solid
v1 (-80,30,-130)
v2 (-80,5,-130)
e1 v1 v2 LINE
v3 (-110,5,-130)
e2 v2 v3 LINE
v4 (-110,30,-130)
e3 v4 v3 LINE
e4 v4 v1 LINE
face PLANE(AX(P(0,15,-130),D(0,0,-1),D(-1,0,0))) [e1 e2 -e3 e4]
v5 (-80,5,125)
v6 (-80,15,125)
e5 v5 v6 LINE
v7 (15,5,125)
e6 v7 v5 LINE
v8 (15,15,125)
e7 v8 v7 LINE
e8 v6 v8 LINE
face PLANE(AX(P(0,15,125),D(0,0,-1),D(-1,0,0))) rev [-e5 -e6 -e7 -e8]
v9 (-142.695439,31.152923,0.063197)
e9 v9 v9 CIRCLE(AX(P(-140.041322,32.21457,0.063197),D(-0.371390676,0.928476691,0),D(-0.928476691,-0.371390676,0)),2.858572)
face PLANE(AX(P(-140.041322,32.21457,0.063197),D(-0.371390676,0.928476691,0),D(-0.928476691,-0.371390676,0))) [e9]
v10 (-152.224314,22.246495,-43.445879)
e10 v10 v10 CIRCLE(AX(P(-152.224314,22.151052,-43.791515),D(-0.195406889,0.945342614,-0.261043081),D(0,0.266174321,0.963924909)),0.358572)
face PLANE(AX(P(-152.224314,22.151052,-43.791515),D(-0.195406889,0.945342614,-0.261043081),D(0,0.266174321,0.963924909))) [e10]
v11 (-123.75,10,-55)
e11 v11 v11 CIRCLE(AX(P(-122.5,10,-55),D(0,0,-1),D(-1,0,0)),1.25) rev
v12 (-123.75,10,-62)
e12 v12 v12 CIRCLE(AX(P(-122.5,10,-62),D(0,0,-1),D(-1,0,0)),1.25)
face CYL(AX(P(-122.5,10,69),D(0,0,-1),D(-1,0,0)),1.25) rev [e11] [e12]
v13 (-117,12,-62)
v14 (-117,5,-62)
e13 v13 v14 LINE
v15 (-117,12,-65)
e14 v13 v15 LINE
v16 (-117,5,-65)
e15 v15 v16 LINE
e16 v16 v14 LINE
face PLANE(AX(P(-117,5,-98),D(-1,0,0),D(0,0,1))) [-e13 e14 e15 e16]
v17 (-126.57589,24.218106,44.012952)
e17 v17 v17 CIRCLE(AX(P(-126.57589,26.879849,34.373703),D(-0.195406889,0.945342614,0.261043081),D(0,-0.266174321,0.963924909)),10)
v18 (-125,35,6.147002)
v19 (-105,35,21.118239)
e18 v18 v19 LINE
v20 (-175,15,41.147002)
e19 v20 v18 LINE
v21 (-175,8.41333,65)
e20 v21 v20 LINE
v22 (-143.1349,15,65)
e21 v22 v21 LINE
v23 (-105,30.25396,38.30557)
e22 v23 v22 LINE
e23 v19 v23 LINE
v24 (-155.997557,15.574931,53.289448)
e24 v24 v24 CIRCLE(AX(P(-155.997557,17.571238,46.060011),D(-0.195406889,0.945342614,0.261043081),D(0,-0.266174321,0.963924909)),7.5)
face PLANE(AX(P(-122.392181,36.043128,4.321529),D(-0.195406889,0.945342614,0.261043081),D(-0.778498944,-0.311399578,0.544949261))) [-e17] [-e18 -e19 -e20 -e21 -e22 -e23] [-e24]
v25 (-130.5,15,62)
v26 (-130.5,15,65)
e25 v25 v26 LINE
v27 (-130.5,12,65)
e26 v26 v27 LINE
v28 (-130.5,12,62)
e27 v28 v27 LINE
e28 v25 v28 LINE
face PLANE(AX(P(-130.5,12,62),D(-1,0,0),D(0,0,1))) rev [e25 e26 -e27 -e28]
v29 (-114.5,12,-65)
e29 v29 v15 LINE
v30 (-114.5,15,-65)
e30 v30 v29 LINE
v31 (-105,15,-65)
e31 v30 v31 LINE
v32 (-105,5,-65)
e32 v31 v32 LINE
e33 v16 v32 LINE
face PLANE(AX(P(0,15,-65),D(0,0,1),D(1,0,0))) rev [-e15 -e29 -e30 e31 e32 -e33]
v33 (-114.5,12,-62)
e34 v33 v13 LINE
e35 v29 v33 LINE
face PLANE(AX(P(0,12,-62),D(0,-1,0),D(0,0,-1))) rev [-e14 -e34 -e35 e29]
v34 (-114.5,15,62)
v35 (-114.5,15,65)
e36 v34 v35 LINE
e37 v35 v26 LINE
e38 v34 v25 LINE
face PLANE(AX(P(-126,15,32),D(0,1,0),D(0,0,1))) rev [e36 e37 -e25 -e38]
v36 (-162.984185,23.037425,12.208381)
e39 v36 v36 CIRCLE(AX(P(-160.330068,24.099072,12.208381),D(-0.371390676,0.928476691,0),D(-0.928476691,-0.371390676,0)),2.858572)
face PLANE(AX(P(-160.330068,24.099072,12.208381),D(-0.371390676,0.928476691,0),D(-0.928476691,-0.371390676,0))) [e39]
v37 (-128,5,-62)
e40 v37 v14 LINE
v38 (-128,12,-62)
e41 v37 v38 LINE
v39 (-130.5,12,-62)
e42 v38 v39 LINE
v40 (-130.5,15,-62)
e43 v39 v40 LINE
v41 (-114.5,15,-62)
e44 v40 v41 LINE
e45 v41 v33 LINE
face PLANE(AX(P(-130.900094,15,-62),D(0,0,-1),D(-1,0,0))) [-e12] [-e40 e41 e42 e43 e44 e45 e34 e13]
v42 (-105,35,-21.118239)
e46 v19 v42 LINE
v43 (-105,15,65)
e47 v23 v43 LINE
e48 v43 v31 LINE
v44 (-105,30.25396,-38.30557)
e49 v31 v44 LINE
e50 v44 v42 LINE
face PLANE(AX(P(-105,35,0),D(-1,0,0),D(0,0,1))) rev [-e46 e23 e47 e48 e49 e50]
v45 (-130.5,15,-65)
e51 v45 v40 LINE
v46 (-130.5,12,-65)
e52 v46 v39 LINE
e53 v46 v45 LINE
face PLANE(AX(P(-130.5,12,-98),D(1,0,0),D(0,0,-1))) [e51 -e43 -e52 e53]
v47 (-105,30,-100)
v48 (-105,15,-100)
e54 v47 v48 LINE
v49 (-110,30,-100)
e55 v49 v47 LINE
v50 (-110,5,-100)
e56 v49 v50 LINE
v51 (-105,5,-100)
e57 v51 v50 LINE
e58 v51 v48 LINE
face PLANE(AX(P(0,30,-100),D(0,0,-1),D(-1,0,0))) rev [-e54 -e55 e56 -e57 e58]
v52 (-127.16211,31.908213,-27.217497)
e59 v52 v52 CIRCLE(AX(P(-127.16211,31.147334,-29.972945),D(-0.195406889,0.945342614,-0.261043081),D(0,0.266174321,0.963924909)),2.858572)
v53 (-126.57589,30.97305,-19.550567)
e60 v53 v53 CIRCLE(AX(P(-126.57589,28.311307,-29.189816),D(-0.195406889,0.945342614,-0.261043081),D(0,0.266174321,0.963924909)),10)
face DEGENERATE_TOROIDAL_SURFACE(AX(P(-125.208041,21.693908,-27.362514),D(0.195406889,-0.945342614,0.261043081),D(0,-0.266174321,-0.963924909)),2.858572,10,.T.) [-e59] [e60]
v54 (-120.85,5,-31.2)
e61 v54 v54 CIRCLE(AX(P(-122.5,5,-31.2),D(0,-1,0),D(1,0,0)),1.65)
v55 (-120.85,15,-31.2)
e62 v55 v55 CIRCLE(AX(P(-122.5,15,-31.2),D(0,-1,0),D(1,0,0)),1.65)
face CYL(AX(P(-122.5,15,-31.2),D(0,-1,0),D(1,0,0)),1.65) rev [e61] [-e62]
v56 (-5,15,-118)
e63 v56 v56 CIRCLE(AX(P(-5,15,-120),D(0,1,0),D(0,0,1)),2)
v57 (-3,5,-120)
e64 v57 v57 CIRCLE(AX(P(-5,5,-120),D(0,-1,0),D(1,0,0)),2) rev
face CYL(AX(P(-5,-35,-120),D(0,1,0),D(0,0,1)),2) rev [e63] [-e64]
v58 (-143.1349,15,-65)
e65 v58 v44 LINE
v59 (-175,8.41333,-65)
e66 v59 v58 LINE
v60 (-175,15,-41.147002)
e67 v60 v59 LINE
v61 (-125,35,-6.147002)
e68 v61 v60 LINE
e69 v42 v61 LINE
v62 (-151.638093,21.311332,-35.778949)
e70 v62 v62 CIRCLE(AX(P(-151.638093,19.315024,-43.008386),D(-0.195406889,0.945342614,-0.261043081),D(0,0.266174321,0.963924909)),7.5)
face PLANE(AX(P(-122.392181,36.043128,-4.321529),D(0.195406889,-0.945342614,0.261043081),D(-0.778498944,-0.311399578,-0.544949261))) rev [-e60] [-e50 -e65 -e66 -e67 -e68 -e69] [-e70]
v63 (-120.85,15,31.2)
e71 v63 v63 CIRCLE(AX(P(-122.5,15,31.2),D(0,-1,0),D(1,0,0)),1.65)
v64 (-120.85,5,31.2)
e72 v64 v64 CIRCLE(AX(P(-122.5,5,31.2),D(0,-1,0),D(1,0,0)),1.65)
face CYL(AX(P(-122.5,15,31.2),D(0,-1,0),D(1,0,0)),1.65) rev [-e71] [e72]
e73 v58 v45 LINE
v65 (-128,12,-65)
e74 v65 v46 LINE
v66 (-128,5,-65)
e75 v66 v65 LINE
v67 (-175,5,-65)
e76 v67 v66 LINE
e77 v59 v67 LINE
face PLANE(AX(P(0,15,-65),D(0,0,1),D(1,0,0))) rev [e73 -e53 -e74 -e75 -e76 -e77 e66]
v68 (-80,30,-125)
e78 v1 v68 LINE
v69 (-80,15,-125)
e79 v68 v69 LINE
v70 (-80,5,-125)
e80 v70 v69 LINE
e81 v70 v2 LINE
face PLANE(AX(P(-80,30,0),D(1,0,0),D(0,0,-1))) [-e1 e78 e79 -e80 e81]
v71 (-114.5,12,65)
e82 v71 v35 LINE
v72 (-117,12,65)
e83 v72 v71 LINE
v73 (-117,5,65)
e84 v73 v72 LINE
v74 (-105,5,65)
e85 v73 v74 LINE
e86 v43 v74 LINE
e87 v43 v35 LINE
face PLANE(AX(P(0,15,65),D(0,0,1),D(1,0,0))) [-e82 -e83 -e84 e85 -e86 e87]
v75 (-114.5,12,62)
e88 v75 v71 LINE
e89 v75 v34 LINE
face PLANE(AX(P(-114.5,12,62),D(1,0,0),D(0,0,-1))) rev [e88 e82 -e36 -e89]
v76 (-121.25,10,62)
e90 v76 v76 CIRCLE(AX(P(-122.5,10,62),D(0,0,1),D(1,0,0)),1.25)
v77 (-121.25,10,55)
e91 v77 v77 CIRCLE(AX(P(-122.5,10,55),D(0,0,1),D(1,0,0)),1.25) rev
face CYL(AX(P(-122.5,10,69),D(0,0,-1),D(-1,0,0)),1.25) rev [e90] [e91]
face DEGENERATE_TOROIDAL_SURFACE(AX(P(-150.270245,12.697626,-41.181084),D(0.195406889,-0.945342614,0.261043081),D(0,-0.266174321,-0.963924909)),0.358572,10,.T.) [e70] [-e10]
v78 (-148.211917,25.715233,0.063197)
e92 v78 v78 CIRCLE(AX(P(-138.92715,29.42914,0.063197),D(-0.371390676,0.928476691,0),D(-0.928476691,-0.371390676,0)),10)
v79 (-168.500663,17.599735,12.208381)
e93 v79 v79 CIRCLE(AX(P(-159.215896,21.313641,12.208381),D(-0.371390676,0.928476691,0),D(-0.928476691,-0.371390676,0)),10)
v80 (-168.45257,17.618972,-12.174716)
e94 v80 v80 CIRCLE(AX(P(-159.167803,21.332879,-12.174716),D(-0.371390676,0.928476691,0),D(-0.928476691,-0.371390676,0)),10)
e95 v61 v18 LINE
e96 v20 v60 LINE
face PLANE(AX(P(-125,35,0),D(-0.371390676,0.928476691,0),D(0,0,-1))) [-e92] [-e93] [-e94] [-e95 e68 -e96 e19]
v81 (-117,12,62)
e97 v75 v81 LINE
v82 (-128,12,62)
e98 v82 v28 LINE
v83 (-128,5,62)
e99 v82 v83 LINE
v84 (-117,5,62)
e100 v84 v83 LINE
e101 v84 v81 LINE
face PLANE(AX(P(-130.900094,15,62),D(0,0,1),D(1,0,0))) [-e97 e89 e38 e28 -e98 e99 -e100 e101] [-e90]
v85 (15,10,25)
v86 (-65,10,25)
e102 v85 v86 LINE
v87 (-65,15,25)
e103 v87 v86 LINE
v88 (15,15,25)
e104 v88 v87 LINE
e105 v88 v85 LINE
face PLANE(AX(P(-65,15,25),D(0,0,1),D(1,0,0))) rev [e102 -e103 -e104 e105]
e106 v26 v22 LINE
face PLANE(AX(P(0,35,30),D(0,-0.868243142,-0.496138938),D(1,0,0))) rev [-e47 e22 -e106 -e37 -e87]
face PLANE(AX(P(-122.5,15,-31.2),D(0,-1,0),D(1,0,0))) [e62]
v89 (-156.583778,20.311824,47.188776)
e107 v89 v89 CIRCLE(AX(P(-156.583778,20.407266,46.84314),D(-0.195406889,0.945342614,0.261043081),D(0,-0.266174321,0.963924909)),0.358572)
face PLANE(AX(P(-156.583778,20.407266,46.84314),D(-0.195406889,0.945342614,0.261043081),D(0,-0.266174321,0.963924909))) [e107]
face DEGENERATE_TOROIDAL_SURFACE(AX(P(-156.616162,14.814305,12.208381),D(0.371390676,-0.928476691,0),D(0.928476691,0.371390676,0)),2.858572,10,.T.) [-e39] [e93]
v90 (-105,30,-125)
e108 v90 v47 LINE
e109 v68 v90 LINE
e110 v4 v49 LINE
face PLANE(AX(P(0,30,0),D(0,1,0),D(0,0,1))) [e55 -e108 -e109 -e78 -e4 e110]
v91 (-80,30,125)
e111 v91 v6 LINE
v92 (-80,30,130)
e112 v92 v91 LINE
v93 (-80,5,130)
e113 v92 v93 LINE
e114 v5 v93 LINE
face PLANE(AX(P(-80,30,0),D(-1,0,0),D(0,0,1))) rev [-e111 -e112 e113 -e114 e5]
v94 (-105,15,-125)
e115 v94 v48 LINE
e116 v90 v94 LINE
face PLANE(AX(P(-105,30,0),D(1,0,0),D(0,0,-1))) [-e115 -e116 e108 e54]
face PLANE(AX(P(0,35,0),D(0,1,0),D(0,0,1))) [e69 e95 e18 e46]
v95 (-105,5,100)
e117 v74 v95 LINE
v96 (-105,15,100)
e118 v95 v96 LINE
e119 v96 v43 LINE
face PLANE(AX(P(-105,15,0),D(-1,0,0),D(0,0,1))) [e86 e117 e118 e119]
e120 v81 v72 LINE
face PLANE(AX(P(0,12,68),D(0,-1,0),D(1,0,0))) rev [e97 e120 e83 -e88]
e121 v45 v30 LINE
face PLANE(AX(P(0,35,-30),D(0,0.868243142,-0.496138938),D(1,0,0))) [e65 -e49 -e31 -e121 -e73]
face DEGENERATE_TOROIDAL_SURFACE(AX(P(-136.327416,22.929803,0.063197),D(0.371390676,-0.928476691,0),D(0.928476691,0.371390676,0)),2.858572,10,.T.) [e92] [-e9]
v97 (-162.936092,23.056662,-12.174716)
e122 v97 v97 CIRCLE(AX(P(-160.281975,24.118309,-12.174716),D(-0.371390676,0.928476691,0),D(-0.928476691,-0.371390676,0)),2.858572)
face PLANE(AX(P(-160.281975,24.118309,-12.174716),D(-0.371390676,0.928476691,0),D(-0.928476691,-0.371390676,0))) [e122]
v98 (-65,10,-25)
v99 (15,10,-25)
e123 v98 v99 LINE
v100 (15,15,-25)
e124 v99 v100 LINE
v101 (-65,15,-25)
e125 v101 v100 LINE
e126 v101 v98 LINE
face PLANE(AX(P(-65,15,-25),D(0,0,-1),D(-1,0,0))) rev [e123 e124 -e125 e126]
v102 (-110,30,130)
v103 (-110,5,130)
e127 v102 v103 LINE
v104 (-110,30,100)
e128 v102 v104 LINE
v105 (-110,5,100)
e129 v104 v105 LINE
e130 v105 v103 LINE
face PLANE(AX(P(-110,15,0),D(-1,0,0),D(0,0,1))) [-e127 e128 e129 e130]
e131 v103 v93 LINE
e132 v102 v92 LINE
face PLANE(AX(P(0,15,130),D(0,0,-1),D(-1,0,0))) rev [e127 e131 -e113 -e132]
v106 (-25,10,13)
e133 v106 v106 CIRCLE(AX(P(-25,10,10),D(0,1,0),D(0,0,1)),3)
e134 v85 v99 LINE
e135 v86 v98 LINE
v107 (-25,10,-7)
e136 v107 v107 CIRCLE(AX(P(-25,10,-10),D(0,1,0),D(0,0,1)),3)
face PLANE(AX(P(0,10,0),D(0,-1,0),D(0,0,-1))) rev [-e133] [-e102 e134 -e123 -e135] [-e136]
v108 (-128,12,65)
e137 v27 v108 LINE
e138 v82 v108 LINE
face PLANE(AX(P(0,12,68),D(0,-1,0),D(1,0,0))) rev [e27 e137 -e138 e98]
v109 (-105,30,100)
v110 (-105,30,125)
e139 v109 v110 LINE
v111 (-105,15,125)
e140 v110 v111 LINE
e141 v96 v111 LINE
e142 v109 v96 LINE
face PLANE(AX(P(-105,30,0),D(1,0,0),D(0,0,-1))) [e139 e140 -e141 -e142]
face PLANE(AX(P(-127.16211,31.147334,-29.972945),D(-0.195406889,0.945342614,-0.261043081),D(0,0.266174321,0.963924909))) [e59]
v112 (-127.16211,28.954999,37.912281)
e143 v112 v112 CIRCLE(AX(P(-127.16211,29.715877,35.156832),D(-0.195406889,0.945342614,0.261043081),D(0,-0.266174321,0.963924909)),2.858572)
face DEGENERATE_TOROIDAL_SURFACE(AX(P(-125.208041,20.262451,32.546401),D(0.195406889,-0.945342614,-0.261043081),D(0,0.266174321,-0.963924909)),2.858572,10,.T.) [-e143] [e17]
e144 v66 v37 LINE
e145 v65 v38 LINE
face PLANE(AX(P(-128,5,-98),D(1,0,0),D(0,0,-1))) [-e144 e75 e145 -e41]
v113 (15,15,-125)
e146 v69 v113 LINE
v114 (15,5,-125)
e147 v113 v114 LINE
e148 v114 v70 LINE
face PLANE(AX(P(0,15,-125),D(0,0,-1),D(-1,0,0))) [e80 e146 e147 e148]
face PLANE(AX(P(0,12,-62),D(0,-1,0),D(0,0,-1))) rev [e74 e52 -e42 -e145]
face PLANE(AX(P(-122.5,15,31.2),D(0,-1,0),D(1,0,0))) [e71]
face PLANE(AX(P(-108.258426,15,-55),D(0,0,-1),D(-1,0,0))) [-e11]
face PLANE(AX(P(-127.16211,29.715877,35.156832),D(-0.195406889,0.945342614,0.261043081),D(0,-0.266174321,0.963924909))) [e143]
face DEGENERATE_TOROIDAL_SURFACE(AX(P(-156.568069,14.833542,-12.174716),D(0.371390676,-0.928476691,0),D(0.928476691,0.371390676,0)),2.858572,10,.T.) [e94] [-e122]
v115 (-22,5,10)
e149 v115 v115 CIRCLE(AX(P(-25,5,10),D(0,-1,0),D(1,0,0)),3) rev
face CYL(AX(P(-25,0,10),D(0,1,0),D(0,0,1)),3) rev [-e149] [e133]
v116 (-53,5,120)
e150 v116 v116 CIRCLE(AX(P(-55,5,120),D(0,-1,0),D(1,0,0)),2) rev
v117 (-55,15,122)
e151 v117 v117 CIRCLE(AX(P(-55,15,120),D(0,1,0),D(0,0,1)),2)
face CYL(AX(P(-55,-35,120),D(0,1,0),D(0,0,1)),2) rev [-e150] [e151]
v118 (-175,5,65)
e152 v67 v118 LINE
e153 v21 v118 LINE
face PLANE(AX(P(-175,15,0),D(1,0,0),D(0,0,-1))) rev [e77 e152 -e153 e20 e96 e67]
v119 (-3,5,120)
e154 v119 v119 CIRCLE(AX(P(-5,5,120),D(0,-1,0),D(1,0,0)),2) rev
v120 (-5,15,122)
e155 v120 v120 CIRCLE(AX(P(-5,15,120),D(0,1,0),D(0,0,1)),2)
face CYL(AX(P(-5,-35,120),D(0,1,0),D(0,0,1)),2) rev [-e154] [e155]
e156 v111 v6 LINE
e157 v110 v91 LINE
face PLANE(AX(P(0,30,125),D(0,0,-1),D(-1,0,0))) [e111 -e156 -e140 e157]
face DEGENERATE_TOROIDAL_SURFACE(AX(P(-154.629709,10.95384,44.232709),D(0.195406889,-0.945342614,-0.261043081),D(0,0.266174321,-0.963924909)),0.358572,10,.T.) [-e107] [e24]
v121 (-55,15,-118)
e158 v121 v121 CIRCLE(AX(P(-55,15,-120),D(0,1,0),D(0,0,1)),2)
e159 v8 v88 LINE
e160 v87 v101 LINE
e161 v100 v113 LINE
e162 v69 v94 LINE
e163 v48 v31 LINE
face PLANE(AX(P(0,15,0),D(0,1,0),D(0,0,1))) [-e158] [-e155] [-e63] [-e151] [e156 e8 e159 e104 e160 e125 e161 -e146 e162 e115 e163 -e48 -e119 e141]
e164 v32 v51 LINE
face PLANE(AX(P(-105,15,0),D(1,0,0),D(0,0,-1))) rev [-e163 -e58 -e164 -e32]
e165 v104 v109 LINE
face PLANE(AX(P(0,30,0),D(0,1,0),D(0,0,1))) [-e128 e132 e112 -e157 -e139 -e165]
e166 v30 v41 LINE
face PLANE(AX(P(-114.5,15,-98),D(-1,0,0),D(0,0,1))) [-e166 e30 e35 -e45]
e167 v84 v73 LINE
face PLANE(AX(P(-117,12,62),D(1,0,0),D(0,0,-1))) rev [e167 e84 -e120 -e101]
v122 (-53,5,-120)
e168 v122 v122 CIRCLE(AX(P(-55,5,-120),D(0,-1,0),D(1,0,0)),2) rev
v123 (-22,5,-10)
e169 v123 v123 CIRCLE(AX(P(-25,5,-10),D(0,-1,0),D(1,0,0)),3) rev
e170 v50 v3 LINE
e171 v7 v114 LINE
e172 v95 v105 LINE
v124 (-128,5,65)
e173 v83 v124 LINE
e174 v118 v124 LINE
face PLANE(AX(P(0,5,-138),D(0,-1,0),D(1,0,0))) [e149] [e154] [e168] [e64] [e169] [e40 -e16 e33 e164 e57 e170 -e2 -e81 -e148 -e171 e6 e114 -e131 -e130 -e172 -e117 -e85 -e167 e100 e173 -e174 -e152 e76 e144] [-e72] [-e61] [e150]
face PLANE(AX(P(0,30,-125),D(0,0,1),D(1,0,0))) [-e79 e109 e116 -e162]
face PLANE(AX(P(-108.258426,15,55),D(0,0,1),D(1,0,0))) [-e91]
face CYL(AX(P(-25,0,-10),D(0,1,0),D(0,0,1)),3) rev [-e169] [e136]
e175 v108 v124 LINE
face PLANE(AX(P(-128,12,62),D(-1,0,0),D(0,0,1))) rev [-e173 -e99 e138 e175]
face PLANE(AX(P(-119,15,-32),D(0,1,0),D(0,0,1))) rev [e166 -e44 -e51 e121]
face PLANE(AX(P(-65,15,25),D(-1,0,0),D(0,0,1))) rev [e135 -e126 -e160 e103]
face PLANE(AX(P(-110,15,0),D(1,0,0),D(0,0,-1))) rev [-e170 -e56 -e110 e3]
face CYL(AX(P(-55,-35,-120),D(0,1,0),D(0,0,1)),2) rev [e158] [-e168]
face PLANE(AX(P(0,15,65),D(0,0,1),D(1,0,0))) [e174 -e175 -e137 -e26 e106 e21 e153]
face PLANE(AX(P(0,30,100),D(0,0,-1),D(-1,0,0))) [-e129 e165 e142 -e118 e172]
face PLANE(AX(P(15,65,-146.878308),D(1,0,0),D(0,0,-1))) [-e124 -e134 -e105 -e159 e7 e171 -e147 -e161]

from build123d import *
from OCP.BRepFilletAPI import BRepFilletAPI_MakeChamfer

# Parameters (mm, degrees)
AUFSATZ_LINEAR_AUSTRAGEN1_DEPTH      = 15
SKIZZE2_W                            = 5
SKIZZE2_H                            = 4
SKIZZE2_H_2                          = 3
AUFSATZ_LINEAR_AUSTRAGEN2_DEPTH      = 37
AUFSATZ_LINEAR_AUSTRAGEN3_DEPTH      = 15
SKIZZE4_W                            = 5
SKIZZE4_H                            = 250
AUFSATZ_LINEAR_AUSTRAGEN4_DEPTH      = 15
SKIZZE5_W                            = 30
SKIZZE5_H                            = 5
AUFSATZ_LINEAR_AUSTRAGEN5_DEPTH      = 30
AUFSATZ_LINEAR_AUSTRAGEN6_DEPTH      = 15
AUFSATZ_LINEAR_AUSTRAGEN6_2_DEPTH    = 15
SKIZZE7_W                            = 5
SKIZZE7_H                            = 5
AUFSATZ_LINEAR_AUSTRAGEN7_DEPTH      = 15
AUFSATZ_LINEAR_AUSTRAGEN8_DEPTH      = 15
AUFSATZ_LINEAR_AUSTRAGEN8_DEPTH_BACK = 15
SKIZZE8_W                            = 5
SKIZZE8_H                            = 30.74644599
SKIZZE8_H_2                          = 29.008771532
SKIZZE9_W                            = 5
SKIZZE9_H                            = 5
AUFSATZ_LINEAR_AUSTRAGEN10_DEPTH     = 15
SKIZZE10_W                           = 5
SKIZZE10_H                           = 30
SCHNITT_LINEAR_AUSTRAGEN1_DEPTH      = 1.01
SKIZZE12_W                           = 10.711230156
SKIZZE12_H                           = 5
SKIZZE12_W_2                         = 5
SKIZZE12_H_2                         = 5.74644599
SKIZZE12_H_3                         = 4.008771532
SKIZZE12_W_3                         = 18.406645612
SKIZZE12_H_4                         = 11.130363441
SKIZZE12_W_4                         = 9.588104439
SKIZZE12_H_5                         = 13.193622238
SCHNITT_LINEAR_AUSTRAGEN2_DEPTH      = 15
SKIZZE13_W                           = 10.711230156
SKIZZE13_H                           = 5
SKIZZE13_W_2                         = 9.588104439
SKIZZE13_W_3                         = 5
SKIZZE13_H_2                         = 13.193622238
SKIZZE13_H_3                         = 11.130363441
SKIZZE13_W_4                         = 18.406645612
SCHNITT_LINEAR_AUSTRAGEN3_DEPTH      = 15
SKIZZE14_W                           = 50
SKIZZE14_H                           = 50
SKIZZE14_W_2                         = 20
AUFSATZ_LINEAR_AUSTRAGEN11_DEPTH     = 20
FASE2_SIZE                           = 20
FASE2_SIZE2                          = 50
FASE3_SIZE                           = 20
FASE3_SIZE2                          = 35
FASE4_SIZE                           = 20
SKIZZE15_R                           = 10
SKIZZE15_R_2                         = 7.5
AUFSATZ_LINEAR_AUSTRAGEN12_DEPTH     = 3
VERRUNDUNG1_R                        = 10
SKIZZE18_R                           = 10
SKIZZE18_R_2                         = 7.5
AUFSATZ_LINEAR_AUSTRAGEN13_DEPTH     = 3
VERRUNDUNG2_R                        = 10
SKIZZE19_R                           = 10
AUFSATZ_LINEAR_AUSTRAGEN14_DEPTH     = 3
VERRUNDUNG3_R                        = 10
SKIZZE20_R                           = 1.5
SCHNITT_LINEAR_AUSTRAGEN4_DEPTH      = 250
SKIZZE21_W                           = 4
SKIZZE21_H                           = 7
SKIZZE21_H_2                         = 5.2
SKIZZE21_W_2                         = 41
AUFSATZ_LINEAR_AUSTRAGEN15_DEPTH     = 10
SKIZZE22_R                           = 1.75
SCHNITT_LINEAR_AUSTRAGEN5_DEPTH      = 20
SCHNITT_LINEAR_AUSTRAGEN8_DEPTH      = 50
SCHNITT_LINEAR_AUSTRAGEN8_DEPTH_BACK = 50
SKIZZE25_W                           = 212.967285893
SKIZZE25_H                           = 303.234570009
SKIZZE26_W                           = 50
SKIZZE26_H                           = 5
SCHNITT_LINEAR_AUSTRAGEN9_DEPTH      = 80
SKIZZE28_R                           = 12.5
SCHNITT_LINEAR_AUSTRAGEN10_DEPTH     = 80
SKIZZE29_R                           = 23.129558289
AUFSATZ_LINEAR_AUSTRAGEN16_DEPTH     = 10
SKIZZE33_W                           = 50
SKIZZE33_H                           = 5
AUFSATZ_LINEAR_AUSTRAGEN17_DEPTH     = 160
SKIZZE34_W                           = 160
SKIZZE34_H                           = 50
AUFSATZ_LINEAR_AUSTRAGEN18_DEPTH     = 15
SKIZZE36_R                           = 2.5
SCHNITT_LINEAR_AUSTRAGEN12_DEPTH     = 250
SKIZZE37_R                           = 3
SCHNITT_LINEAR_AUSTRAGEN16_DEPTH     = 78
SKIZZE38_R                           = 2
SCHNITT_LINEAR_AUSTRAGEN17_DEPTH     = 50
SKIZZE39_W                           = 160
SKIZZE39_H                           = 50
SCHNITT_LINEAR_AUSTRAGEN18_DEPTH     = 15
SCHNITT_LINEAR_START                 = -5
SKIZZE40_W                           = 160
SKIZZE40_H                           = 50
SKIZZE40_R                           = 3
SCHNITT_LINEAR_AUSTRAGEN19_DEPTH     = 5
SKIZZE41_R                           = 3
SCHNITT_LINEAR_AUSTRAGEN22_DEPTH     = 10
SKIZZE46_W                           = 65
SKIZZE46_H                           = 5
SKIZZE46_W_2                         = 30
SKIZZE46_W_3                         = 95
SCHNITT_LINEAR_AUSTRAGEN25_DEPTH     = 268
SKIZZE48_W                           = 7
SKIZZE48_H                           = 10
SCHNITT_LINEAR_AUSTRAGEN26_DEPTH     = 33
SKIZZE49_W                           = 7
SKIZZE49_H                           = 10
SCHNITT_LINEAR_AUSTRAGEN28_DEPTH     = 33
SKIZZE50_R                           = 1.65
SCHNITT_LINEAR_AUSTRAGEN31_DEPTH     = 7
SKIZZE52_R                           = 7.40510693
SKIZZE52_R_2                         = 8.306038869
AUFSATZ_LINEAR_AUSTRAGEN31_DEPTH     = 17
SKIZZE53_W                           = 20.840230673
SKIZZE53_H                           = 124
AUFSATZ_LINEAR_AUSTRAGEN34_DEPTH     = 10
SKIZZE54_W                           = 9.5
SKIZZE54_H                           = 3
SKIZZE54_W_2                         = 2.5
SCHNITT_LINEAR_AUSTRAGEN32_DEPTH     = 3
SKIZZE55_W                           = 2.5
SKIZZE55_H                           = 3
SCHNITT_LINEAR_AUSTRAGEN34_DEPTH     = 6
SKIZZE57_R                           = 1.25
SCHNITT_LINEAR_AUSTRAGEN35_DEPTH     = 131
SKIZZE58_W                           = 30.500290538
SKIZZE58_H                           = 110
AUFSATZ_LINEAR_AUSTRAGEN35_DEPTH     = 10
SKIZZE59_R                           = 1.65
SCHNITT_LINEAR_AUSTRAGEN36_DEPTH     = 10
SKIZZE60_W                           = 2
SKIZZE60_H                           = 7
SKIZZE60_H_2                         = 3
SCHNITT_LINEAR_AUSTRAGEN40_DEPTH     = 36
SKIZZE61_W                           = 2
SKIZZE61_H                           = 7
SKIZZE61_H_2                         = 3
SCHNITT_LINEAR_AUSTRAGEN41_DEPTH     = 3


with BuildPart() as part:
    # Skizze1 → Aufsatz-Linear austragen1 (new body)
    with BuildSketch(Plane(origin=(0, 0, 0), x_dir=(1, 0, 0), z_dir=(0, 1, 0))):
        Polygon((-105, 65), (-175, 65), (-175, -65), (-105, -65), (-105, -125), (145, -125), (185, -20), (175, -20), (175, 0), (175, 20), (185, 20), (145, 125), (-105, 125), align=None)
        Polygon((175, 0), (175, 20), (185, 20), (185, 0), (185, -20), (175, -20), align=None)
    extrude(amount=AUFSATZ_LINEAR_AUSTRAGEN1_DEPTH)

    # Skizze2 → Aufsatz-Linear austragen2 (add)
    with BuildSketch(Plane(origin=(0, 15, 0), x_dir=(1, 0, 0), z_dir=(0, 1, 0))):
        with Locations((-122.5, -40)):
            Rectangle(SKIZZE2_W, SKIZZE2_H)
        with Locations((-122.5, 40)):
            Rectangle(SKIZZE2_W, SKIZZE2_H)
        with Locations((-122.5, 63.5)):
            Rectangle(SKIZZE2_W, SKIZZE2_H_2)
        with Locations((-122.5, -63.5)):
            Rectangle(SKIZZE2_W, SKIZZE2_H_2)
    extrude(amount=-AUFSATZ_LINEAR_AUSTRAGEN2_DEPTH)

    # Skizze3 → Aufsatz-Linear austragen3 (add)
    with BuildSketch(Plane(origin=(0, 15, 0), x_dir=(1, 0, 0), z_dir=(0, 1, 0))):
        Polygon((145, -125), (195, -125), (195, 125), (145, 125), (185, 20), (185, -20), align=None)
    extrude(amount=-AUFSATZ_LINEAR_AUSTRAGEN3_DEPTH)

    # Skizze4 → Aufsatz-Linear austragen4 (add)
    with BuildSketch(Plane(origin=(0, 15, 0), x_dir=(1, 0, 0), z_dir=(0, 1, 0))):
        with Locations((197.5, 0)):
            Rectangle(SKIZZE4_W, SKIZZE4_H)
    extrude(amount=-AUFSATZ_LINEAR_AUSTRAGEN4_DEPTH)

    # Skizze5 → Aufsatz-Linear austragen5 (add)
    with BuildSketch(Plane(origin=(0, 15, 0), x_dir=(1, 0, 0), z_dir=(0, 1, 0))):
        with Locations((-90, 122.5)):
            Rectangle(SKIZZE5_W, SKIZZE5_H)
        with Locations((-90, -122.5)):
            Rectangle(SKIZZE5_W, SKIZZE5_H)
    extrude(amount=-AUFSATZ_LINEAR_AUSTRAGEN5_DEPTH)



with BuildPart() as body_2:
    # Skizze6 → Aufsatz-Linear austragen6 (new body)
    with BuildSketch(Plane(origin=(0, 15, 0), x_dir=(1, 0, 0), z_dir=(0, 1, 0))):
        Polygon((-61.593354388, 130), (-110, 130), (-110, 88.869636559), (-105, 88.869636559), (-105, 125), (-61.593354388, 125), align=None)
    extrude(amount=AUFSATZ_LINEAR_AUSTRAGEN6_DEPTH)


with BuildPart() as body_3:
    # Skizze6 → Aufsatz-Linear austragen6 2 (new body)
    with BuildSketch(Plane(origin=(0, 15, 0), x_dir=(1, 0, 0), z_dir=(0, 1, 0))):
        Polygon((-110, -86.806377762), (-110, -130), (-70.411895561, -130), (-70.411895561, -125), (-105, -125), (-105, -86.806377762), align=None)
    extrude(amount=AUFSATZ_LINEAR_AUSTRAGEN6_2_DEPTH)


with BuildPart() as part_1:
    add(part.part)

    add(body_2.part)  # Aufsatz-Linear austragen7 merges body 2

    add(body_3.part)  # Aufsatz-Linear austragen7 merges body 3
    # Skizze7 → Aufsatz-Linear austragen7 (add)
    with BuildSketch(Plane.XZ):
        Polygon((-110, -88.869636559), (-110, -125), (-105, -125), (-105, -120), (-105, -88.869636559), align=None)
        with Locations((-107.5, -127.5)):
            Rectangle(SKIZZE7_W, SKIZZE7_H)
        Polygon((-105, -125), (-105, -130), (-61.593354388, -130), (-61.593354388, -125), (-75, -125), align=None)
        Polygon((-105, 125), (-110, 125), (-110, 86.806377762), (-105, 86.806377762), (-105, 120), align=None)
        with Locations((-107.5, 127.5)):
            Rectangle(SKIZZE7_W, SKIZZE7_H)
        Polygon((-70.411895561, 130), (-105, 130), (-105, 125), (-75, 125), (-70.411895561, 125), align=None)
    extrude(amount=-AUFSATZ_LINEAR_AUSTRAGEN7_DEPTH)

    # Skizze8 → Aufsatz-Linear austragen8 (add, two sides: drawn at the far end of the back side and taken through both)
    with BuildSketch(Plane(origin=(0, 15, 0), x_dir=(1, 0, 0), z_dir=(0, 1, 0)).offset(-AUFSATZ_LINEAR_AUSTRAGEN8_DEPTH_BACK)):
        with Locations((147.5, -109.626777005)):
            Rectangle(SKIZZE8_W, SKIZZE8_H)
        Polygon((145, -125), (109.288769844, -125), (109.288769844, -130), (150, -130), (150, -125), align=None)
        with Locations((147.5, 110.495614234)):
            Rectangle(SKIZZE8_W, SKIZZE8_H_2)
        Polygon((118.994620346, 130), (118.994620346, 125), (145, 125), (150, 125), (150, 130), align=None)
    extrude(amount=AUFSATZ_LINEAR_AUSTRAGEN8_DEPTH + AUFSATZ_LINEAR_AUSTRAGEN8_DEPTH_BACK)

    # Skizze9 → Aufsatz-Linear austragen10 (add)
    with BuildSketch(Plane(origin=(0, 15, 0), x_dir=(1, 0, 0), z_dir=(0, 1, 0))):
        Polygon((145, 4), (150, 4), (150, 9), (150, 14), (145, 14), align=None)
        with Locations((152.5, 6.5)):
            Rectangle(SKIZZE9_W, SKIZZE9_H)
        Polygon((190, 4), (200, 4), (200, 14), (196, 14), (196, 9), (190, 9), align=None)
        Polygon((196, 105), (200, 105), (200, 125), (150, 125), (150, 120), (196, 120), align=None)
    extrude(amount=AUFSATZ_LINEAR_AUSTRAGEN10_DEPTH)

    # Skizze10 → Schnitt-Linear austragen1 (cut)
    with BuildSketch(Plane.ZY.offset(-118.994620346)):
        with Locations((-127.5, 15)):
            Rectangle(SKIZZE10_W, SKIZZE10_H)
    extrude(amount=-SCHNITT_LINEAR_AUSTRAGEN1_DEPTH, mode=Mode.SUBTRACT)

    # Skizze12 → Schnitt-Linear austragen2 (cut)
    with BuildSketch(Plane(origin=(0, 15, 0), x_dir=(1, 0, 0), z_dir=(0, 1, 0))):
        with Locations((114.644384922, -127.5)):
            Rectangle(SKIZZE12_W, SKIZZE12_H)
        with Locations((147.5, -97.126777005)):
            Rectangle(SKIZZE12_W_2, SKIZZE12_H_2)
        with Locations((147.5, 97.995614234)):
            Rectangle(SKIZZE12_W_2, SKIZZE12_H_3)
        with Locations((-70.796677194, 127.5)):
            Rectangle(SKIZZE12_W_3, SKIZZE12_H)
        with Locations((-107.5, 94.43481828)):
            Rectangle(SKIZZE12_W_2, SKIZZE12_H_4)
        with Locations((-75.20594778, -127.5)):
            Rectangle(SKIZZE12_W_4, SKIZZE12_H)
        with Locations((-107.5, -93.403188881)):
            Rectangle(SKIZZE12_W_2, SKIZZE12_H_5)
    extrude(amount=SCHNITT_LINEAR_AUSTRAGEN2_DEPTH, mode=Mode.SUBTRACT)

    # Skizze13 → Schnitt-Linear austragen3 (cut)
    with BuildSketch(Plane(origin=(0, 15, 0), x_dir=(1, 0, 0), z_dir=(0, 1, 0))):
        with Locations((114.644384922, -127.5)):
            Rectangle(SKIZZE13_W, SKIZZE13_H)
        with Locations((-75.20594778, -127.5)):
            Rectangle(SKIZZE13_W_2, SKIZZE13_H)
        with Locations((-107.5, -93.403188881)):
            Rectangle(SKIZZE13_W_3, SKIZZE13_H_2)
        with Locations((-107.5, 94.43481828)):
            Rectangle(SKIZZE13_W_3, SKIZZE13_H_3)
        with Locations((-70.796677194, 127.5)):
            Rectangle(SKIZZE13_W_4, SKIZZE13_H)
    extrude(amount=-SCHNITT_LINEAR_AUSTRAGEN3_DEPTH, mode=Mode.SUBTRACT)

    # Skizze14 → Aufsatz-Linear austragen11 (add)
    with BuildSketch(Plane(origin=(0, 15, 0), x_dir=(1, 0, 0), z_dir=(0, 1, 0))):
        Polygon((-175, -25), (-175, -65), (-105, -65), (-105, -25), (-125, -25), align=None)
        with Locations((-150, 0)):
            Rectangle(SKIZZE14_W, SKIZZE14_H)
        with Locations((-115, 0)):
            Rectangle(SKIZZE14_W_2, SKIZZE14_H)
        Polygon((-175, 65), (-175, 25), (-125, 25), (-105, 25), (-105, 65), align=None)
    extrude(amount=AUFSATZ_LINEAR_AUSTRAGEN11_DEPTH)

    # Fase2
    fase2_edges = [part_1.edges().sort_by_distance(p)[0] for p in [
        (-175, 35, 0),
    ]]
    fase2_side = [part_1.faces().sort_by_distance(p)[0] for p in [
        (-175, 17.5, 0),
    ]]
    chamfer(fase2_edges, length=FASE2_SIZE, length2=FASE2_SIZE2, reference=fase2_side[0])

    # Fase3: one chamfer whose edges measure the first distance from different faces: ONE call of the kernel's chamfer builder (chamfer() names one face for all edges)
    fase3_edges_1 = [part_1.edges().sort_by_distance(p)[0] for p in [
        (-115, 35, -65),
    ]]
    fase3_side_1 = [part_1.faces().sort_by_distance(p)[0] for p in [
        (-134.615695793, 13.348705502, -65),
    ]]
    fase3_edges_2 = [part_1.edges().sort_by_distance(p)[0] for p in [
        (-115, 35, 65),
    ]]
    fase3_side_2 = [part_1.faces().sort_by_distance(p)[0] for p in [
        (-134.615695793, 13.348705502, 65),
    ]]
    fase3 = BRepFilletAPI_MakeChamfer(part_1.part.solid().wrapped)
    for e in fase3_edges_1:
        fase3.Add(FASE3_SIZE, FASE3_SIZE2, e.wrapped, fase3_side_1[0].wrapped)  # the first distance lies on this face
    for e in fase3_edges_2:
        fase3.Add(FASE3_SIZE, FASE3_SIZE2, e.wrapped, fase3_side_2[0].wrapped)  # the first distance lies on this face
    add(Compound.cast(fase3.Shape()), mode=Mode.REPLACE)

    # Fase4
    fase4_edges = [part_1.edges().sort_by_distance(p)[0] for p in [
        (-150, 25, 47.5),
        (-150, 25, -47.5),
    ]]
    chamfer(fase4_edges, length=FASE4_SIZE)

    # Skizze15 → Aufsatz-Linear austragen12 (add)
    with BuildSketch(Plane(origin=(-11.551963806, 55.886277719, -15.432210402), x_dir=(0.9807222582245502, 0.18835756766165584, -0.05201229592628623), z_dir=(-0.19540688888301463, 0.9453426139004438, -0.2610430809673718))):
        with Locations(Location((-117.284914164, 20.601047932, 0), (0, 0, 270))):
            Circle(SKIZZE15_R)
        with Locations(Location((-142.839757147, 36.315690789, 0), (0, 0, 270))):
            Circle(SKIZZE15_R_2)
    extrude(amount=AUFSATZ_LINEAR_AUSTRAGEN12_DEPTH)

    # Verrundung1
    # the kernel refuses this fillet: 10 mm, written as the material it takes off along each edge
    with BuildSketch(Plane(origin=(-127.162110348, 31.147334465, -29.972945243), x_dir=(0, 0.26617432079083353, 0.963924909394678), z_dir=(-0.9807222582245501, -0.18835756766165582, 0.052012295926286305))) as verrundung1_piece_1:
        with BuildLine():
            CenterArc((2.858571571, -10), VERRUNDUNG1_R, 44.427004001, 45.572995999)
            Line((2.858571571, 0), (2.858571571, 0.2))
            Line((2.858571571, 0.2), (10, 0.2))
            Line((10, 0.2), (10.2, 0))
            ThreePointArc((10.2, 0), (10.2, -1.5), (10.142828569, -2.86))
            Line((10.142828569, -2.86), (10, -3))
        make_face()
    revolve(axis=Axis((-127.162110348, 31.147334465, -29.972945243), (-0.19540688888301466, 0.9453426139004438, -0.2610430809673718)), mode=Mode.SUBTRACT)
    with BuildSketch(Plane(origin=(-152.224313666, 22.15105201, -43.791514879), x_dir=(0, 0.26617432079083364, 0.9639249093946781), z_dir=(-0.9807222582245503, -0.18835756766165584, 0.052012295926286325))) as verrundung1_piece_2:
        with BuildLine():
            CenterArc((0.358571571, -10), VERRUNDUNG1_R, 44.427004001, 45.572995999)
            Line((0.358571571, 0), (0.358571571, 0.2))
            Line((0.358571571, 0.2), (7.5, 0.2))
            Line((7.5, 0.2), (7.7, 0))
            ThreePointArc((7.7, 0), (7.7, -1.5), (7.642828569, -2.86))
            Line((7.642828569, -2.86), (7.5, -3))
        make_face()
    revolve(axis=Axis((-152.224313666, 22.15105201, -43.791514879), (-0.19540688888301466, 0.9453426139004438, -0.2610430809673718)), mode=Mode.SUBTRACT)

    # Skizze18 → Aufsatz-Linear austragen13 (add)
    with BuildSketch(Plane(origin=(-11.551963806, 55.886277719, 15.432210402), x_dir=(0.9807222582245502, 0.18835756766165587, 0.05201229592628629), z_dir=(-0.19540688888301466, 0.9453426139004437, 0.261043080967372))):
        with Locations(Location((-117.284914164, -25.97894302, 0), (0, 0, 270))):
            Circle(SKIZZE18_R)
        with Locations(Location((-147.284914164, -39.72137923, 0), (0, 0, 270))):
            Circle(SKIZZE18_R_2)
    extrude(amount=AUFSATZ_LINEAR_AUSTRAGEN13_DEPTH)

    # Verrundung2
    # the kernel refuses this fillet: 10 mm, written as the material it takes off along each edge
    with BuildSketch(Plane(origin=(-127.162110348, 29.715876892, 35.156832279), x_dir=(0, -0.26617432079083353, 0.963924909394678), z_dir=(-0.98072225822455, -0.1883575676616558, -0.0520122959262863))) as verrundung2_piece_1:
        with BuildLine():
            CenterArc((2.858571571, -10), VERRUNDUNG2_R, 44.427004001, 45.572995999)
            Line((2.858571571, 0), (2.858571571, 0.2))
            Line((2.858571571, 0.2), (10, 0.2))
            Line((10, 0.2), (10.2, 0))
            ThreePointArc((10.2, 0), (10.2, -1.5), (10.142828569, -2.86))
            Line((10.142828569, -2.86), (10, -3))
        make_face()
    revolve(axis=Axis((-127.162110348, 29.715876892, 35.156832279), (-0.19540688888301463, 0.9453426139004436, 0.26104308096737205)), mode=Mode.SUBTRACT)
    with BuildSketch(Plane(origin=(-156.583778094, 20.407266239, 46.843139979), x_dir=(0, -0.26617432079083425, 0.9639249093946779), z_dir=(-0.9807222582245501, -0.18835756766165576, -0.05201229592628644))) as verrundung2_piece_2:
        with BuildLine():
            CenterArc((0.358571571, -10), VERRUNDUNG2_R, 44.427004001, 45.572995999)
            Line((0.358571571, 0), (0.358571571, 0.2))
            Line((0.358571571, 0.2), (7.5, 0.2))
            Line((7.5, 0.2), (7.7, 0))
            ThreePointArc((7.7, 0), (7.7, -1.5), (7.642828569, -2.86))
            Line((7.642828569, -2.86), (7.5, -3))
        make_face()
    revolve(axis=Axis((-156.583778094, 20.407266239, 46.843139979), (-0.19540688888301463, 0.9453426139004436, 0.26104308096737205)), mode=Mode.SUBTRACT)

    # Skizze19 → Aufsatz-Linear austragen14 (add)
    with BuildSketch(Plane(origin=(-29.310344828, 73.275862069, 0), x_dir=(0.9284766908852605, 0.371390676354101, 0), z_dir=(-0.371390676354101, 0.9284766908852605, 0))):
        with Locations(Location((-118.060912688, -0.063197478, 0), (0, 0, 180))):
            Circle(SKIZZE19_R)
        with Locations(Location((-139.860763151, 12.174715734, 0), (0, 0, 180))):
            Circle(SKIZZE19_R)
        with Locations(Location((-139.91256076, -12.208380744, 0), (0, 0, 180))):
            Circle(SKIZZE19_R)
    extrude(amount=AUFSATZ_LINEAR_AUSTRAGEN14_DEPTH)

    # Verrundung3
    # the kernel refuses this fillet: 10 mm, written as the material it takes off along each edge
    with BuildSketch(Plane(origin=(-140.041322392, 32.214569927, 0.063197478), x_dir=(-0.9284766908852606, -0.37139067635410067, 0), z_dir=(0, 0, -1))) as verrundung3_piece_1:
        with BuildLine():
            CenterArc((2.858571571, -10), VERRUNDUNG3_R, 44.427004001, 45.572995999)
            Line((2.858571571, 0), (2.858571571, 0.2))
            Line((2.858571571, 0.2), (10, 0.2))
            Line((10, 0.2), (10.2, 0))
            ThreePointArc((10.2, 0), (10.2, -1.5), (10.142828569, -2.86))
            Line((10.142828569, -2.86), (10, -3))
        make_face()
    revolve(axis=Axis((-140.041322392, 32.214569927, 0.063197478), (-0.371390676354101, 0.9284766908852605, 0)), mode=Mode.SUBTRACT)
    with BuildSketch(Plane(origin=(-160.281975412, 24.11830872, -12.174715734), x_dir=(-0.9284766908852602, -0.37139067635410167, 0), z_dir=(0, 0, -1))) as verrundung3_piece_2:
        with BuildLine():
            CenterArc((2.858571571, -10), VERRUNDUNG3_R, 44.427004001, 45.572995999)
            Line((2.858571571, 0), (2.858571571, 0.2))
            Line((2.858571571, 0.2), (10, 0.2))
            Line((10, 0.2), (10.2, 0))
            ThreePointArc((10.2, 0), (10.2, -1.5), (10.142828569, -2.86))
            Line((10.142828569, -2.86), (10, -3))
        make_face()
    revolve(axis=Axis((-160.281975412, 24.11830872, -12.174715734), (-0.371390676354101, 0.9284766908852605, 0)), mode=Mode.SUBTRACT)
    with BuildSketch(Plane(origin=(-160.330068284, 24.099071571, 12.208380744), x_dir=(-0.9284766908852602, -0.37139067635410167, 0), z_dir=(0, 0, -1))) as verrundung3_piece_3:
        with BuildLine():
            CenterArc((2.858571571, -10), VERRUNDUNG3_R, 44.427004001, 45.572995999)
            Line((2.858571571, 0), (2.858571571, 0.2))
            Line((2.858571571, 0.2), (10, 0.2))
            Line((10, 0.2), (10.2, 0))
            ThreePointArc((10.2, 0), (10.2, -1.5), (10.142828569, -2.86))
            Line((10.142828569, -2.86), (10, -3))
        make_face()
    revolve(axis=Axis((-160.330068284, 24.099071571, 12.208380744), (-0.371390676354101, 0.9284766908852605, 0)), mode=Mode.SUBTRACT)

    # Skizze20 → Schnitt-Linear austragen4 (cut)
    with BuildSketch(Plane(origin=(0, 0, -65), x_dir=(-1, 0, 0), z_dir=(0, 0, -1))):
        with Locations(Location((122.5, -19.5, 0), (0, 0, 180))):
            Circle(SKIZZE20_R)
        with Locations(Location((122.5, -2.5, 0), (0, 0, 180))):
            Circle(SKIZZE20_R)
    extrude(amount=-SCHNITT_LINEAR_AUSTRAGEN4_DEPTH, mode=Mode.SUBTRACT)

    # Skizze21 → Aufsatz-Linear austragen15 (add)
    with BuildSketch(Plane(origin=(0, 15, 0), x_dir=(1, 0, 0), z_dir=(0, 1, 0))):
        Polygon((145, -100), (150, -100), (191, -100), (191, -93), (145, -93), align=None)
        with Locations((193, -96.5)):
            Rectangle(SKIZZE21_W, SKIZZE21_H)
        with Locations((193, -102.6)):
            Rectangle(SKIZZE21_W, SKIZZE21_H_2)
        with Locations((170.5, -121.5)):
            Rectangle(SKIZZE21_W_2, SKIZZE21_H)
        with Locations((193, -121.5)):
            Rectangle(SKIZZE21_W, SKIZZE21_H)
        with Locations((193, -115.4)):
            Rectangle(SKIZZE21_W, SKIZZE21_H_2)
    extrude(amount=AUFSATZ_LINEAR_AUSTRAGEN15_DEPTH)

    # Skizze22 → Schnitt-Linear austragen5 (cut)
    with BuildSketch(Plane(origin=(0, 15, 0), x_dir=(1, 0, 0), z_dir=(0, 1, 0))):
        with Locations(Location((146.069548912, -58.232980191, 0), (0, 0, 270))):
            Circle(SKIZZE22_R)
        with Locations(Location((146.069548912, -13.432980191, 0), (0, 0, 270))):
            Circle(SKIZZE22_R)
        with Locations(Location((185.869548912, -58.232980191, 0), (0, 0, 270))):
            Circle(SKIZZE22_R)
        with Locations(Location((185.869548912, -13.432980191, 0), (0, 0, 270))):
            Circle(SKIZZE22_R)
    extrude(amount=-SCHNITT_LINEAR_AUSTRAGEN5_DEPTH, mode=Mode.SUBTRACT)

    # Skizze25 → Schnitt-Linear austragen8 (cut, two sides: drawn at the far end of the back side and taken through both)
    with BuildSketch(Plane(origin=(0, 15, 0), x_dir=(1, 0, 0), z_dir=(0, 1, 0)).offset(-SCHNITT_LINEAR_AUSTRAGEN8_DEPTH_BACK)):
        with Locations((121.483642947, -4.738977069)):
            Rectangle(SKIZZE25_W, SKIZZE25_H)
    extrude(amount=SCHNITT_LINEAR_AUSTRAGEN8_DEPTH + SCHNITT_LINEAR_AUSTRAGEN8_DEPTH_BACK, mode=Mode.SUBTRACT)

    # Skizze26 → Schnitt-Linear austragen9 (cut)
    with BuildSketch(Plane(origin=(15, 0, 0), x_dir=(0, 0, -1), z_dir=(1, 0, 0))):
        with Locations((0, 12.5)):
            Rectangle(SKIZZE26_W, SKIZZE26_H)
    extrude(amount=-SCHNITT_LINEAR_AUSTRAGEN9_DEPTH, mode=Mode.SUBTRACT)

    # Skizze28 → Schnitt-Linear austragen10 (cut)
    with BuildSketch(Plane(origin=(0, 10, 0), x_dir=(1, 0, 0), z_dir=(0, 1, 0))):
        with Locations(Location((-35, 0, 0), (0, 0, 270))):
            Circle(SKIZZE28_R)
    extrude(amount=-SCHNITT_LINEAR_AUSTRAGEN10_DEPTH, mode=Mode.SUBTRACT)

    # Skizze29 → Aufsatz-Linear austragen16 (add)
    with BuildSketch(Plane(origin=(0, 0, 0), x_dir=(-1, 0, 0), z_dir=(0, -1, 0))):
        with Locations((35, 0)):
            Circle(SKIZZE29_R)
    extrude(amount=-AUFSATZ_LINEAR_AUSTRAGEN16_DEPTH)

    # Skizze33 → Aufsatz-Linear austragen17 (add)
    with BuildSketch(Plane(origin=(-65, 0, 0), x_dir=(0, 0, -1), z_dir=(1, 0, 0))):
        with Locations((0, 12.5)):
            Rectangle(SKIZZE33_W, SKIZZE33_H)
    extrude(amount=AUFSATZ_LINEAR_AUSTRAGEN17_DEPTH)

    # Skizze34 → Aufsatz-Linear austragen18 (add)
    with BuildSketch(Plane(origin=(0, 0, 0), x_dir=(-1, 0, 0), z_dir=(0, -1, 0))):
        with Locations((-15, 0)):
            Rectangle(SKIZZE34_W, SKIZZE34_H)
    extrude(amount=AUFSATZ_LINEAR_AUSTRAGEN18_DEPTH)

    # Skizze36 → Schnitt-Linear austragen12 (cut)
    with BuildSketch(Plane.XY.offset(125)):
        with Locations((-97.5, -7.5)):
            Circle(SKIZZE36_R)
        with Locations((-82.5, -7.5)):
            Circle(SKIZZE36_R)
    extrude(amount=-SCHNITT_LINEAR_AUSTRAGEN12_DEPTH, mode=Mode.SUBTRACT)

    # Skizze37 → Schnitt-Linear austragen16 (cut)
    with BuildSketch(Plane(origin=(0, 15, 0), x_dir=(1, 0, 0), z_dir=(0, 1, 0))):
        with Locations(Location((35, -10, 0), (0, 0, 270))):
            Circle(SKIZZE37_R)
        with Locations(Location((35, 10, 0), (0, 0, 270))):
            Circle(SKIZZE37_R)
        with Locations(Location((75, -10, 0), (0, 0, 270))):
            Circle(SKIZZE37_R)
        with Locations(Location((75, 10, 0), (0, 0, 270))):
            Circle(SKIZZE37_R)
    extrude(amount=-SCHNITT_LINEAR_AUSTRAGEN16_DEPTH, mode=Mode.SUBTRACT)

    # Skizze38 → Schnitt-Linear austragen17 (cut)
    with BuildSketch(Plane(origin=(0, 15, 0), x_dir=(1, 0, 0), z_dir=(0, 1, 0))):
        with Locations(Location((-55, -120, 0), (0, 0, 270))):
            Circle(SKIZZE38_R)
        with Locations(Location((-5, -120, 0), (0, 0, 270))):
            Circle(SKIZZE38_R)
        with Locations(Location((-5, 120, 0), (0, 0, 270))):
            Circle(SKIZZE38_R)
        with Locations(Location((-55, 120, 0), (0, 0, 270))):
            Circle(SKIZZE38_R)
    extrude(amount=-SCHNITT_LINEAR_AUSTRAGEN17_DEPTH, mode=Mode.SUBTRACT)

    # Skizze39 → Schnitt-Linear austragen18 (cut)
    with BuildSketch(Plane(origin=(0, -15, 0), x_dir=(-1, 0, 0), z_dir=(0, -1, 0))):
        with Locations((-15, 0)):
            Rectangle(SKIZZE39_W, SKIZZE39_H)
    extrude(amount=-SCHNITT_LINEAR_AUSTRAGEN18_DEPTH, mode=Mode.SUBTRACT)

    # Skizze40 → Schnitt-Linear austragen19 (cut)
    with BuildSketch(Plane.XZ.offset(-10).offset(SCHNITT_LINEAR_START)):
        with Locations((15, 0)):
            Rectangle(SKIZZE40_W, SKIZZE40_H)
        with Locations((35, -10)):
            Circle(SKIZZE40_R, mode=Mode.SUBTRACT)
        with Locations((75, -10)):
            Circle(SKIZZE40_R, mode=Mode.SUBTRACT)
    extrude(amount=SCHNITT_LINEAR_AUSTRAGEN19_DEPTH, mode=Mode.SUBTRACT)

    # Skizze41 → Schnitt-Linear austragen22 (cut)
    with BuildSketch(Plane(origin=(0, 10, 0), x_dir=(1, 0, 0), z_dir=(0, 1, 0))):
        with Locations(Location((-25, -10, 0), (0, 0, 270))):
            Circle(SKIZZE41_R)
        with Locations(Location((-25, 10, 0), (0, 0, 270))):
            Circle(SKIZZE41_R)
    extrude(amount=-SCHNITT_LINEAR_AUSTRAGEN22_DEPTH, mode=Mode.SUBTRACT)

    # Skizze46 → Schnitt-Linear austragen25 (cut)
    with BuildSketch(Plane.XY.offset(130)):
        with Locations((-142.5, 2.5)):
            Rectangle(SKIZZE46_W, SKIZZE46_H)
        Polygon((-110, 0), (-175, 0), (-175, -27.405237196), (16.713519916, -27.405237196), (16.713519916, 5), (15, 5), (15, 0), (-80, 0), align=None)
        with Locations((-95, 2.5)):
            Rectangle(SKIZZE46_W_2, SKIZZE46_H)
        with Locations((-32.5, 2.5)):
            Rectangle(SKIZZE46_W_3, SKIZZE46_H)
    extrude(amount=-SCHNITT_LINEAR_AUSTRAGEN25_DEPTH, mode=Mode.SUBTRACT)

    # Skizze48 → Schnitt-Linear austragen26 (cut)
    with BuildSketch(Plane.XY.offset(65)):
        with Locations((-122.5, 10)):
            Rectangle(SKIZZE48_W, SKIZZE48_H)
    extrude(amount=-SCHNITT_LINEAR_AUSTRAGEN26_DEPTH, mode=Mode.SUBTRACT)

    # Skizze49 → Schnitt-Linear austragen28 (cut)
    with BuildSketch(Plane(origin=(0, 0, -65), x_dir=(-1, 0, 0), z_dir=(0, 0, -1))):
        with Locations((122.5, 10)):
            Rectangle(SKIZZE49_W, SKIZZE49_H)
    extrude(amount=-SCHNITT_LINEAR_AUSTRAGEN28_DEPTH, mode=Mode.SUBTRACT)

    # Skizze50 → Schnitt-Linear austragen31 (cut)
    with BuildSketch(Plane.XZ.offset(-15)):
        with Locations(Location((-122.5, -44, 0), (0, 0, 270))):
            Circle(SKIZZE50_R)
        with Locations(Location((-122.5, 44, 0), (0, 0, 270))):
            Circle(SKIZZE50_R)
    extrude(amount=-SCHNITT_LINEAR_AUSTRAGEN31_DEPTH, mode=Mode.SUBTRACT)

    # Skizze52 → Aufsatz-Linear austragen31 (add)
    with BuildSketch(Plane.XZ.offset(-5)):
        with Locations((-123.191620095, -39.689142712)):
            Circle(SKIZZE52_R)
        with Locations((-121.44161898, 38.452211436)):
            Circle(SKIZZE52_R_2)
    extrude(amount=-AUFSATZ_LINEAR_AUSTRAGEN31_DEPTH)

    # Skizze53 → Aufsatz-Linear austragen34 (add)
    with BuildSketch(Plane.XZ.offset(-5)):
        with Locations((-120.479979011, 0)):
            Rectangle(SKIZZE53_W, SKIZZE53_H)
    extrude(amount=-AUFSATZ_LINEAR_AUSTRAGEN34_DEPTH)

    # Skizze54 → Schnitt-Linear austragen32 (cut)
    with BuildSketch(Plane(origin=(0, 0, -65), x_dir=(-1, 0, 0), z_dir=(0, 0, -1))):
        with Locations((121.25, 13.5)):
            Rectangle(SKIZZE54_W, SKIZZE54_H)
        with Locations((127.25, 13.5)):
            Rectangle(SKIZZE54_W_2, SKIZZE54_H)
    extrude(amount=-SCHNITT_LINEAR_AUSTRAGEN32_DEPTH, mode=Mode.SUBTRACT)

    # Skizze55 → Schnitt-Linear austragen34 (cut)
    with BuildSketch(Plane.XY.offset(62)):
        with Locations((-127.25, 13.5)):
            Rectangle(SKIZZE55_W, SKIZZE55_H)
        with Locations((-117.75, 13.5)):
            Rectangle(SKIZZE55_W, SKIZZE55_H)
    extrude(amount=SCHNITT_LINEAR_AUSTRAGEN34_DEPTH, mode=Mode.SUBTRACT)

    # Skizze57 → Schnitt-Linear austragen35 (cut)
    with BuildSketch(Plane(origin=(0, 0, -62), x_dir=(-1, 0, 0), z_dir=(0, 0, -1))):
        with Locations((122.5, 10)):
            Circle(SKIZZE57_R)
    extrude(amount=-SCHNITT_LINEAR_AUSTRAGEN35_DEPTH, mode=Mode.SUBTRACT)

    # Skizze58 → Aufsatz-Linear austragen35 (add)
    with BuildSketch(Plane(origin=(0, 5, 0), x_dir=(-1, 0, 0), z_dir=(0, -1, 0))):
        with Locations((123.508571453, 0)):
            Rectangle(SKIZZE58_W, SKIZZE58_H)
    extrude(amount=-AUFSATZ_LINEAR_AUSTRAGEN35_DEPTH)

    # Skizze59 → Schnitt-Linear austragen36 (cut)
    with BuildSketch(Plane.XZ.offset(-5)):
        with Locations((-122.5, -31.2)):
            Circle(SKIZZE59_R)
        with Locations((-122.5, 31.2)):
            Circle(SKIZZE59_R)
    extrude(amount=-SCHNITT_LINEAR_AUSTRAGEN36_DEPTH, mode=Mode.SUBTRACT)

    # Skizze60 → Schnitt-Linear austragen40 (cut)
    with BuildSketch(Plane(origin=(0, 0, -62), x_dir=(-1, 0, 0), z_dir=(0, 0, -1))):
        with Locations((127, 8.5)):
            Rectangle(SKIZZE60_W, SKIZZE60_H)
        with Locations((118, 8.5)):
            Rectangle(SKIZZE60_W, SKIZZE60_H)
        with Locations((115.5, 13.5)):
            Rectangle(SKIZZE60_W, SKIZZE60_H_2)
        with Locations((129.5, 13.5)):
            Rectangle(SKIZZE60_W, SKIZZE60_H_2)
    extrude(amount=SCHNITT_LINEAR_AUSTRAGEN40_DEPTH, mode=Mode.SUBTRACT)

    # Skizze61 → Schnitt-Linear austragen41 (cut)
    with BuildSketch(Plane.XY.offset(65)):
        with Locations((-127, 8.5)):
            Rectangle(SKIZZE61_W, SKIZZE61_H)
        with Locations((-118, 8.5)):
            Rectangle(SKIZZE61_W, SKIZZE61_H)
        with Locations((-115.5, 13.5)):
            Rectangle(SKIZZE61_W, SKIZZE61_H_2)
        with Locations((-129.5, 13.5)):
            Rectangle(SKIZZE61_W, SKIZZE61_H_2)
    extrude(amount=-SCHNITT_LINEAR_AUSTRAGEN41_DEPTH, mode=Mode.SUBTRACT)


solid = part_1.part
